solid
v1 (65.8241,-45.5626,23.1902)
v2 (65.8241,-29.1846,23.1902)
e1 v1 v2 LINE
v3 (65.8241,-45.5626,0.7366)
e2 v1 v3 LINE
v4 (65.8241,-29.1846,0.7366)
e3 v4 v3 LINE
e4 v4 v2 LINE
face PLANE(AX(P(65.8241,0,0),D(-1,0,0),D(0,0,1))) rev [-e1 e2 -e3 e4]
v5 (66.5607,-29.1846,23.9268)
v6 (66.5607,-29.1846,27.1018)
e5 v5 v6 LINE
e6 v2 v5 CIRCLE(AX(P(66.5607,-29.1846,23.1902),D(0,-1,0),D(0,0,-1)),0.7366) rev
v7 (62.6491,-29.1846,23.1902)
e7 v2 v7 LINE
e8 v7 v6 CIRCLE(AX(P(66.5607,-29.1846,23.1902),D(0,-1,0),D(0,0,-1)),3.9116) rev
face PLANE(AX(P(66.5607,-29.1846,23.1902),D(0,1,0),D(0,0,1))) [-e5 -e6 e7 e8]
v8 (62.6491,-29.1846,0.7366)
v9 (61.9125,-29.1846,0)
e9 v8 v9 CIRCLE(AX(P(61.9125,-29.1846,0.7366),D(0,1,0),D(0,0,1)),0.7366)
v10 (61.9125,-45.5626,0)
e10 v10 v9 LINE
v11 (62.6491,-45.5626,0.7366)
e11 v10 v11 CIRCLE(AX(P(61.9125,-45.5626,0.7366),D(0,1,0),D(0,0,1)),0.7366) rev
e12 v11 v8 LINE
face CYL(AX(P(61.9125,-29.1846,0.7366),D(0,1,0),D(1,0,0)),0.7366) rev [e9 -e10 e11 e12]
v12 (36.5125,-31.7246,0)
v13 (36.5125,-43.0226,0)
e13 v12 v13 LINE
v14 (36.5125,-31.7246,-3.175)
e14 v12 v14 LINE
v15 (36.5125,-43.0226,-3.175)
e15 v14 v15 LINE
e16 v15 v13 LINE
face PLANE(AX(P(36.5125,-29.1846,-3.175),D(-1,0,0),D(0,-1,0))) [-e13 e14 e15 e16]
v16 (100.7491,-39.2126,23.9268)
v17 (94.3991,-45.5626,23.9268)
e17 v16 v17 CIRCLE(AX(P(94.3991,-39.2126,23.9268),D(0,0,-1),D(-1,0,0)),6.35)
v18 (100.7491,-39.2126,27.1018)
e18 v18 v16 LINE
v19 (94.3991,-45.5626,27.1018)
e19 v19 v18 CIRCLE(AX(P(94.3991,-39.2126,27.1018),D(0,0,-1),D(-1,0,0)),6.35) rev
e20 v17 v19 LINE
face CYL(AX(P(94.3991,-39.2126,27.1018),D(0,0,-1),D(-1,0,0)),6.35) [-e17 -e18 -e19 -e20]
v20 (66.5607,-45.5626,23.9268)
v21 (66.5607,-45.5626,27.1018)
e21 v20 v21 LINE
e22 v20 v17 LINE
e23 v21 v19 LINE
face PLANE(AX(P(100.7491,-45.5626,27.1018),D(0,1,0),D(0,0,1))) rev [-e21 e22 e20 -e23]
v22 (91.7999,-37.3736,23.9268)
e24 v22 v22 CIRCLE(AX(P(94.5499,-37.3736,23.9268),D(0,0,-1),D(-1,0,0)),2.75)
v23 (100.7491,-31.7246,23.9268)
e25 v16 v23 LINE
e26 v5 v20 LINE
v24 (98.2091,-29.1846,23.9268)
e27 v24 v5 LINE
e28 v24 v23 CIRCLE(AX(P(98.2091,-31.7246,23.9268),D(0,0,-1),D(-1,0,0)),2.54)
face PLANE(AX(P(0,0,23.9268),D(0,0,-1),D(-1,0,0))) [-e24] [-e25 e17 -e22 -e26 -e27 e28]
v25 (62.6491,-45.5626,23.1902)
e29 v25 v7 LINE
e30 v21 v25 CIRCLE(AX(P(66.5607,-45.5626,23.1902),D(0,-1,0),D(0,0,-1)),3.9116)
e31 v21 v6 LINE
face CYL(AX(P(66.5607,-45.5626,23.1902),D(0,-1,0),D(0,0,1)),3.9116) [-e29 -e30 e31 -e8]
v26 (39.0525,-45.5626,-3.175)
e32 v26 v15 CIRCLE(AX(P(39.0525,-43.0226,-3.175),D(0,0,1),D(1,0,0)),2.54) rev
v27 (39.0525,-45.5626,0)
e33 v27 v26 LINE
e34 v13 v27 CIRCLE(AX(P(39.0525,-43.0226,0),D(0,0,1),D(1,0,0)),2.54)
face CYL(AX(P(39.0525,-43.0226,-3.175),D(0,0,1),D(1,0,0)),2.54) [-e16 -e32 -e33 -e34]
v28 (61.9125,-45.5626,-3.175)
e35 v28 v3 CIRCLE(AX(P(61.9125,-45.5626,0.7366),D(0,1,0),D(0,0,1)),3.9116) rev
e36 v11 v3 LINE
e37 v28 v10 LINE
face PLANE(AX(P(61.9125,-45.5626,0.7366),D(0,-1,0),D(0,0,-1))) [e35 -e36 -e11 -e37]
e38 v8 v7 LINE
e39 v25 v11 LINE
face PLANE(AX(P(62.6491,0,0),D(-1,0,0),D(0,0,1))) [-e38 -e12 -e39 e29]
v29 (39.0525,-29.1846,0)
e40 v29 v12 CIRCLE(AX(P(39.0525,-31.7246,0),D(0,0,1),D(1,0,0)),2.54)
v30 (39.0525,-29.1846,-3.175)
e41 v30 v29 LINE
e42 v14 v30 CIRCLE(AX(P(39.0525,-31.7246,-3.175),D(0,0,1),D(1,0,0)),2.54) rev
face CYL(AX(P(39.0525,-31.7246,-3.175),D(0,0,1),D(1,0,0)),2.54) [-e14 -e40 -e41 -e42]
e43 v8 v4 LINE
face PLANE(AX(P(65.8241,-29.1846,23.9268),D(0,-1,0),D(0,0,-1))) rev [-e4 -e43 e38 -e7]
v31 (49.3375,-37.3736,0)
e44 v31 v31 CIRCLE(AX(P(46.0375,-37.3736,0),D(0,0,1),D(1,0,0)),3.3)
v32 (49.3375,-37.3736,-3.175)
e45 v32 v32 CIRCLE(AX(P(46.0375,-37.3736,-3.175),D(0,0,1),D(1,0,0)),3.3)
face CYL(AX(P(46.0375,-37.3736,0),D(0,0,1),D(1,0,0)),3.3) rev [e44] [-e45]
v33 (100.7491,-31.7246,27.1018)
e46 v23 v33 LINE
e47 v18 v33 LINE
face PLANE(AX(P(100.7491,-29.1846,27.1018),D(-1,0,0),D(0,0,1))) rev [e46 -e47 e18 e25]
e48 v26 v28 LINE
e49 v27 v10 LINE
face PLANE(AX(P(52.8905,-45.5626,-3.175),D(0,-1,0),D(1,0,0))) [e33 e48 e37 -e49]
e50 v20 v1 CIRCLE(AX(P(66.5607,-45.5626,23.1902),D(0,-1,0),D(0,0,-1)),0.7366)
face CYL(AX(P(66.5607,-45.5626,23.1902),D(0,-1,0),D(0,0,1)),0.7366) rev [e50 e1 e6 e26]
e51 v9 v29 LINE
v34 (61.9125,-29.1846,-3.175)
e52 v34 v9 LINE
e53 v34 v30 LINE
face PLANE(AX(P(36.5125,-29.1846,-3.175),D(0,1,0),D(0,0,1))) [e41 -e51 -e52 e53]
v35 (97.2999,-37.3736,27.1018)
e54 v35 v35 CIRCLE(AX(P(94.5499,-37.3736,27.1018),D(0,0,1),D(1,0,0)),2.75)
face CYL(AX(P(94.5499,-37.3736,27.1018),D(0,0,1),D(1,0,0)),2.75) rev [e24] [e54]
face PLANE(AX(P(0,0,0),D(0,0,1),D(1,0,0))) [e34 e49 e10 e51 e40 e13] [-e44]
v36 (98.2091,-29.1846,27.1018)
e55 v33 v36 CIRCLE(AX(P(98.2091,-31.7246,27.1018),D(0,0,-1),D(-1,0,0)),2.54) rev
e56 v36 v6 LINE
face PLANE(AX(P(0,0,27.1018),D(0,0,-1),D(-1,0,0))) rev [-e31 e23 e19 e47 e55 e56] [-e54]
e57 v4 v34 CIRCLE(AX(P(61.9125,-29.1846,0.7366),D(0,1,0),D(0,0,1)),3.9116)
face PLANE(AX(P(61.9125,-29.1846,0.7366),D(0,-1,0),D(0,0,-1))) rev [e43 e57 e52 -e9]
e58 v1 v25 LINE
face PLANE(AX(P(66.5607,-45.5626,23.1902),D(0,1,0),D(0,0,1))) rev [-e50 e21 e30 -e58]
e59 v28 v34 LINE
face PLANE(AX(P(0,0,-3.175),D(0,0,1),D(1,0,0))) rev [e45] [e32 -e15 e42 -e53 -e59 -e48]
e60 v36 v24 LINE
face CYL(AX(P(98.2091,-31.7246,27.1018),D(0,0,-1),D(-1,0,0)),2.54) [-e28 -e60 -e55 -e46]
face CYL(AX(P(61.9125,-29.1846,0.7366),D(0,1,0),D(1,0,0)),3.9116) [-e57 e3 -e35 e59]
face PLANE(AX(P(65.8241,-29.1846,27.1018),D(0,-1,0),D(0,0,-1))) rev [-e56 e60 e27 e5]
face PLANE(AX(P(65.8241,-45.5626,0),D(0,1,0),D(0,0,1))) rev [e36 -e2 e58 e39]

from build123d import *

# Parameters (mm, degrees)
BASE_FLANGE1_DEPTH           = 3.175
M6_CLEARANCE_HOLE1_D         = 6.6
EDGE_FLANGE1_DEPTH           = 16.378
EDGE_FLANGE2_STRIP_W         = 14.1732
EDGE_FLANGE2_STRIP_H         = 3.175
EDGE_FLANGE2_STRIP_CUT_DEPTH = 16.378
EDGE_FLANGE2_DEPTH           = 16.378
M5_CLEARANCE_HOLE1_D         = 5.5
FILLET1_R                    = 2.54
FILLET2_R                    = 6.35


# Sheet-metal steps are written as plain solids
with BuildPart() as part:
    # Sketch1 → Base-Flange1 (new body)
    with BuildSketch(Plane.XY):
        Polygon((52.8905, -45.562600001), (36.5125, -45.562600001), (36.5125, -29.184600001), (61.9125, -29.184600001), (61.9125, -45.562600001), align=None)
    extrude(amount=-BASE_FLANGE1_DEPTH)

    # M6 Clearance Hole1 (through all)
    with Locations(Plane.XY):
        with Locations((46.0375, -37.373600001)):
            Hole(M6_CLEARANCE_HOLE1_D / 2)

    # Edge-Flange1 section (across the edge) → Edge-Flange1 (add)
    with BuildSketch(Plane(origin=(62.6491, -45.562600001, 0), x_dir=(-1, 0, 0), z_dir=(0, 1, 0))):
        with BuildLine():
            Line((-3.175, 0.7366), (-3.175, 23.9268))
            Line((-3.175, 23.9268), (0, 23.9268))
            Line((0, 23.9268), (0, 0.7366))
            ThreePointArc((0, 0.7366), (0.215745145, 0.215745145), (0.7366, 0))
            Line((0.7366, 0), (0.7366, -3.175))
            ThreePointArc((0.7366, -3.175), (-2.029318885, -2.029318885), (-3.175, 0.7366))
        make_face()
    extrude(amount=EDGE_FLANGE1_DEPTH)

    # Edge-Flange2 strip (across the edge) → Edge-Flange2 strip cut (cut)
    with BuildSketch(Plane(origin=(65.8241, -29.184600001, 23.9268), x_dir=(0, 0, -1), z_dir=(0, -1, 0))):
        with Locations((-6.35, -1.5875)):
            Rectangle(EDGE_FLANGE2_STRIP_W, EDGE_FLANGE2_STRIP_H)
    extrude(amount=EDGE_FLANGE2_STRIP_CUT_DEPTH, mode=Mode.SUBTRACT)

    # Edge-Flange2 section (across the edge) → Edge-Flange2 (add)
    with BuildSketch(Plane(origin=(65.8241, -29.184600001, 23.9268), x_dir=(0, 0, -1), z_dir=(0, -1, 0))):
        with BuildLine():
            Line((-3.175, 0.7366), (-3.175, 34.925))
            Line((-3.175, 34.925), (0, 34.925))
            Line((0, 34.925), (0, 0.7366))
            ThreePointArc((0, 0.7366), (0.215745145, 0.215745145), (0.7366, 0))
            Line((0.7366, 0), (0.7366, -3.175))
            ThreePointArc((0.7366, -3.175), (-2.029318885, -2.029318885), (-3.175, 0.7366))
        make_face()
    extrude(amount=EDGE_FLANGE2_DEPTH)

    # M5 Clearance Hole1 (through all)
    with Locations(Plane.XY.offset(27.1018)):
        with Locations((94.5499, -37.373600001)):
            Hole(M5_CLEARANCE_HOLE1_D / 2)

    # Fillet1
    fillet1_edges = [part.edges().sort_by_distance(p)[0] for p in [
        (100.7491, -29.184600001, 25.5143),
        (36.5125, -45.562600001, -1.5875),
        (36.5125, -29.184600001, -1.5875),
    ]]
    fillet(fillet1_edges, radius=FILLET1_R)

    # Fillet2
    fillet2_edges = [part.edges().sort_by_distance(p)[0] for p in [
        (100.7491, -45.562600001, 25.5143),
    ]]
    fillet(fillet2_edges, radius=FILLET2_R)


solid = part.part
